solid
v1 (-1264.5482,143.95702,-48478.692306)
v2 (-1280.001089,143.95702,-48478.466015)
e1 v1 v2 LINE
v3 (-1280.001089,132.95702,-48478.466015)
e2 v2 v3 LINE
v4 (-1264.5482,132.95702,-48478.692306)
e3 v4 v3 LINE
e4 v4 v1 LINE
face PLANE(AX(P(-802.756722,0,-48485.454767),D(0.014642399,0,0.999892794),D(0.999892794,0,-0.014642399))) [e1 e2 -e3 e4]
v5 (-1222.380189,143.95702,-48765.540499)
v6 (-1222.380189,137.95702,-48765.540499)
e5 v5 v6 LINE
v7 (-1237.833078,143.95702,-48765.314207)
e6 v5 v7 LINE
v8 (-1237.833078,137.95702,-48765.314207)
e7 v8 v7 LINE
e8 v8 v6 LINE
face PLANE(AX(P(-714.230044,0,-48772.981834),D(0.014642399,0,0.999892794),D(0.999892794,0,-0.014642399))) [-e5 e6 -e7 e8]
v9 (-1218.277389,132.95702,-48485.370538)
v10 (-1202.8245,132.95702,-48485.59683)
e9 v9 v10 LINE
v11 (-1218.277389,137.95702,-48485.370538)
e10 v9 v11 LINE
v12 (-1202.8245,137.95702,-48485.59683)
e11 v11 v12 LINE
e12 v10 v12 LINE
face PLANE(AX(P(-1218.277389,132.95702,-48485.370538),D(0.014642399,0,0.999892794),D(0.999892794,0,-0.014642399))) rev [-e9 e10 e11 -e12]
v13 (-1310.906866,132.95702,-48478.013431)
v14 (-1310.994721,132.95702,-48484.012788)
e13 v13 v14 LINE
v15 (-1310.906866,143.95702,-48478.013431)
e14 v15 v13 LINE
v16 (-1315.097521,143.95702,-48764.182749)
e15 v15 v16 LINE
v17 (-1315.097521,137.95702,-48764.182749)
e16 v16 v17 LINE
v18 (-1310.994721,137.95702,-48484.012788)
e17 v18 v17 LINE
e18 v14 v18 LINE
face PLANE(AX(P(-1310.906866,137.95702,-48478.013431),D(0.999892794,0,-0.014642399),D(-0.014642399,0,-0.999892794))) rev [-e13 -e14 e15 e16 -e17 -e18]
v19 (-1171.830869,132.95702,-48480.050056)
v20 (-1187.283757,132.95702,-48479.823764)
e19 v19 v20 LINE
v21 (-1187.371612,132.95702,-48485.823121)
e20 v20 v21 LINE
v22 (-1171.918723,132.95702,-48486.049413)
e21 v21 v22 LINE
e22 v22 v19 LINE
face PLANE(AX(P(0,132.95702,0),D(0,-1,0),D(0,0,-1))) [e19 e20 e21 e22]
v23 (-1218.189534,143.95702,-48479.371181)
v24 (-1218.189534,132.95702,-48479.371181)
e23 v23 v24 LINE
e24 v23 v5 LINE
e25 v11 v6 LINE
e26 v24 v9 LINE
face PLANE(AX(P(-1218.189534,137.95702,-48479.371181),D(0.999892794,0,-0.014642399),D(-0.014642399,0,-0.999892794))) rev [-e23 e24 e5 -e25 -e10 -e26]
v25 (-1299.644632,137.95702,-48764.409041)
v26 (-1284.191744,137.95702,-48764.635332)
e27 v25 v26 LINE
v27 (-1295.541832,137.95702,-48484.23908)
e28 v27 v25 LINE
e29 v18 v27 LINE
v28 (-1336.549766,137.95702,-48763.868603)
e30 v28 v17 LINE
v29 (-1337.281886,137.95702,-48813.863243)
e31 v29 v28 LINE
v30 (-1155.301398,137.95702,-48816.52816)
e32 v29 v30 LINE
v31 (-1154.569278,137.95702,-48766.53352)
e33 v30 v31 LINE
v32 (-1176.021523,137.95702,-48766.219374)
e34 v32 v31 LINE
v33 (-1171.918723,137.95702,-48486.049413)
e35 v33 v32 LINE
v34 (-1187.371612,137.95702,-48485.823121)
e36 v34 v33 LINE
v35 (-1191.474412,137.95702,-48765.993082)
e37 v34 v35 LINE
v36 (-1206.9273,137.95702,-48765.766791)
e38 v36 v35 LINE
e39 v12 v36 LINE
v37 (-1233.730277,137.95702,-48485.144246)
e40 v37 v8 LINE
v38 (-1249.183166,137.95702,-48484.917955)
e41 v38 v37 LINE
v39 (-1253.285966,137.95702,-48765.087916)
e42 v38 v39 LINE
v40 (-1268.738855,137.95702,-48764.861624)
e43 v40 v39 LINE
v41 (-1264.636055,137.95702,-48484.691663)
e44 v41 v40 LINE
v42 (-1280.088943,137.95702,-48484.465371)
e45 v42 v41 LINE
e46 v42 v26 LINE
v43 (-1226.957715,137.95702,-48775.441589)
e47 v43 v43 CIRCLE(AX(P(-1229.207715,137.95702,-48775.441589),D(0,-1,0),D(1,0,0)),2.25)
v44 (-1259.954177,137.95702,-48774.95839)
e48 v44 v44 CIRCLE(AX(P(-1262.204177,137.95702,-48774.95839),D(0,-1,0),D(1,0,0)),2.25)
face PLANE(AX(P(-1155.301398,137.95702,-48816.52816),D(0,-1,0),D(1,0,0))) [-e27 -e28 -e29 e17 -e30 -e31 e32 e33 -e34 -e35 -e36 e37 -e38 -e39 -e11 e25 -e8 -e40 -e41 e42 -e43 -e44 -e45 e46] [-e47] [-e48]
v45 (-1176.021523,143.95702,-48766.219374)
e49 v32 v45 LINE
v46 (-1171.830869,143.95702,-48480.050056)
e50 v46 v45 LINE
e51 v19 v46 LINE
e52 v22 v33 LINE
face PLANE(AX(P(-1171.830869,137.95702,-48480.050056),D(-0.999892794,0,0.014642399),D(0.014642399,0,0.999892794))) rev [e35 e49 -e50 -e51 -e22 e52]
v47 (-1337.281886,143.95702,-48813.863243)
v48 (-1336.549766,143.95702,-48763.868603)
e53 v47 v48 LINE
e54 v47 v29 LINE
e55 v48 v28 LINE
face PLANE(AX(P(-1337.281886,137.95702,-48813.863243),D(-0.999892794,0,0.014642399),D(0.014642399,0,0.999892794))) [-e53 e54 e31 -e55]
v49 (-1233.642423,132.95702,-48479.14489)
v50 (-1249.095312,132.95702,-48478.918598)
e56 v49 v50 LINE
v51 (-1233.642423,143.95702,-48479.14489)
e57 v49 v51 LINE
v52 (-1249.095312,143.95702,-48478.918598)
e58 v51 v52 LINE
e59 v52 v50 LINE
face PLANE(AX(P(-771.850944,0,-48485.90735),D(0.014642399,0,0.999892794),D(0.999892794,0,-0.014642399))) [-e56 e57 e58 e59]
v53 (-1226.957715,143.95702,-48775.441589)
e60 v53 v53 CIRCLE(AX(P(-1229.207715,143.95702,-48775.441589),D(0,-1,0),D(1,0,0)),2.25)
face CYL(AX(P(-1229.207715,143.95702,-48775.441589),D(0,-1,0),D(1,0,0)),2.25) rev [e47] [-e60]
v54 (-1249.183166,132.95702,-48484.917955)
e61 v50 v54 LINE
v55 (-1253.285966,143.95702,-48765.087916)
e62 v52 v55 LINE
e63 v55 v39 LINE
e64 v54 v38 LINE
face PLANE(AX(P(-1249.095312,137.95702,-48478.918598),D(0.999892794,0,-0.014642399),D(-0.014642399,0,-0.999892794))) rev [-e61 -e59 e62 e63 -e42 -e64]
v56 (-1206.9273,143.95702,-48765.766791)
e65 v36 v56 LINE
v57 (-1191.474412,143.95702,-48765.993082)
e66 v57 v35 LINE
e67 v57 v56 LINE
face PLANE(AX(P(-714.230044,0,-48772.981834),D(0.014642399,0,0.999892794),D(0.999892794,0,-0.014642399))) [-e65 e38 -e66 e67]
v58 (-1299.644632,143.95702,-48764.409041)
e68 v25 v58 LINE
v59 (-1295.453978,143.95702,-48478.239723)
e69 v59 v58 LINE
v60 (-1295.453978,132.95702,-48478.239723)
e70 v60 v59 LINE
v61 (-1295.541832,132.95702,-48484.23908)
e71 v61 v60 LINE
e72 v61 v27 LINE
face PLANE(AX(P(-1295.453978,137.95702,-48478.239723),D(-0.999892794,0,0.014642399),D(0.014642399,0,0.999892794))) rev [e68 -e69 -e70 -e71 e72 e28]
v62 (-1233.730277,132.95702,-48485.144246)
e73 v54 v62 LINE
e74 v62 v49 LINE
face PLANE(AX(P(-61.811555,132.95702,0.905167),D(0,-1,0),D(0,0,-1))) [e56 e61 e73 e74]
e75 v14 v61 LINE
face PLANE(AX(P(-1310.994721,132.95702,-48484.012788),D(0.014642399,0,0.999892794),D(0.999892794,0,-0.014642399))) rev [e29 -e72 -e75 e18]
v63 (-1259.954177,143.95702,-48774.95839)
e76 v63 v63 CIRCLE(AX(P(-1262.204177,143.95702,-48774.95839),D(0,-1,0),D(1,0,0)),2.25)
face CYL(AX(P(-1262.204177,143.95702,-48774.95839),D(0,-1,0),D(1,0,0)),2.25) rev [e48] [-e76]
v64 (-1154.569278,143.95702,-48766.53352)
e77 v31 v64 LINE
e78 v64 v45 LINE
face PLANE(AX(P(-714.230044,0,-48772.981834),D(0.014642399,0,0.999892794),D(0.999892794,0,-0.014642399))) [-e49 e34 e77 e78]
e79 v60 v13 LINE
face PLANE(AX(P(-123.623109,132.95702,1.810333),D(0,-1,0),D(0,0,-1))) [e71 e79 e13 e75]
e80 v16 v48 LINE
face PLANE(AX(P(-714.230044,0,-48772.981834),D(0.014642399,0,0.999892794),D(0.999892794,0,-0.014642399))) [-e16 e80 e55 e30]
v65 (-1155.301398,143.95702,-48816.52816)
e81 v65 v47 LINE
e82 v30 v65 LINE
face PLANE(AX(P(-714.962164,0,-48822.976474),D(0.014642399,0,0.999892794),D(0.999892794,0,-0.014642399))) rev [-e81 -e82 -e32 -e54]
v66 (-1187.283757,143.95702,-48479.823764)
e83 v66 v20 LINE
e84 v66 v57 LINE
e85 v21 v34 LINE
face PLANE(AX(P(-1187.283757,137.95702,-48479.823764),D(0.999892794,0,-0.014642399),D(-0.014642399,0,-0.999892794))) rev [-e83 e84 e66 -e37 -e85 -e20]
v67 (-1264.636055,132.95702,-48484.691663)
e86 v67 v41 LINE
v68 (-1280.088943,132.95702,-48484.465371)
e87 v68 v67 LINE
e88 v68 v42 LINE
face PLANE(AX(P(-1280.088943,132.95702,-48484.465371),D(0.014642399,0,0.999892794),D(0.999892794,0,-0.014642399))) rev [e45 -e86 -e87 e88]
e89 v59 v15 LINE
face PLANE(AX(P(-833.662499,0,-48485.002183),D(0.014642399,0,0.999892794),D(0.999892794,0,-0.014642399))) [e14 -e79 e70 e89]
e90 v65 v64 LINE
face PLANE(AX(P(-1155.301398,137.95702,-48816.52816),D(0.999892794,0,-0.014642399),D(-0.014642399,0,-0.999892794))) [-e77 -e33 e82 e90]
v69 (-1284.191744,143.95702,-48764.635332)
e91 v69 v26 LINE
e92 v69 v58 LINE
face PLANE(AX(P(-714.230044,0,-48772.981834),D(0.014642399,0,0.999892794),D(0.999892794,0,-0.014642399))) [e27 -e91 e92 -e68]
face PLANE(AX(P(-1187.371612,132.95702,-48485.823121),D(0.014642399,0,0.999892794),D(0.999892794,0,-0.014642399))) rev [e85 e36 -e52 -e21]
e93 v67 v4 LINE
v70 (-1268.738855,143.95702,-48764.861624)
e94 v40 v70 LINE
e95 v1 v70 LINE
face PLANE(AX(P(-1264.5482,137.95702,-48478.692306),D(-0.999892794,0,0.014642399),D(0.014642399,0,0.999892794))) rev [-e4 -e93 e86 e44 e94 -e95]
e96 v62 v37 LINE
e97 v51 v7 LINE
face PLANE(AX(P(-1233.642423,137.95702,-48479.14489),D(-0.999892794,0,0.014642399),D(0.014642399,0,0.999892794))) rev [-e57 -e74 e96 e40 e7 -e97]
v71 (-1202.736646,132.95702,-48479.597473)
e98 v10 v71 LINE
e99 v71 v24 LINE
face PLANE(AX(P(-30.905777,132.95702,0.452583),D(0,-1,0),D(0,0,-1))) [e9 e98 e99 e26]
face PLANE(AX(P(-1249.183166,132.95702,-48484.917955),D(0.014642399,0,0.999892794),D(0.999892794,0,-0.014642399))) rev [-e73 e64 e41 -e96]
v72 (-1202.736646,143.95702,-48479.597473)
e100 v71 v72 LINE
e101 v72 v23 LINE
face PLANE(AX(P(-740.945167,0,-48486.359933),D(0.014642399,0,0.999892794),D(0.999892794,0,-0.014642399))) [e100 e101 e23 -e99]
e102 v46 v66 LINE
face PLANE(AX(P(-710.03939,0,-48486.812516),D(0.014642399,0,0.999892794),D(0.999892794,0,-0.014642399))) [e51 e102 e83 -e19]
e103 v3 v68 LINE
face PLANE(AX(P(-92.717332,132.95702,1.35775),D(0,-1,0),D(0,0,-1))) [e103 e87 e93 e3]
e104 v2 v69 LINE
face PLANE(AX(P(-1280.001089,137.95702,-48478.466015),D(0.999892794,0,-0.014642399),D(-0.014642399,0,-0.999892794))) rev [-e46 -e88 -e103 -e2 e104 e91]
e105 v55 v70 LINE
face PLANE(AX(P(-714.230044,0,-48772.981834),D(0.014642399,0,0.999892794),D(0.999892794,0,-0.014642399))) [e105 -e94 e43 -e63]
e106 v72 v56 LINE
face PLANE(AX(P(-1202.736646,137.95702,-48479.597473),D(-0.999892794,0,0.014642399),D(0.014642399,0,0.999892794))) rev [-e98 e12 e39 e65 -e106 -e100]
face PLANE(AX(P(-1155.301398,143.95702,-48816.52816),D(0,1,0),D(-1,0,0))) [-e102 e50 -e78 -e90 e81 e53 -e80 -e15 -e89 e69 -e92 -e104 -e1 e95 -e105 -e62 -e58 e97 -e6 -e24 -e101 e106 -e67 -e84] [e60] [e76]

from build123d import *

# Parameters (mm, degrees)
EXTRUDE_1_DEPTH          = 30
EXTRUDE_1_DEPTH_BACK     = 20
SKETCH_1_W               = 182
SKETCH_1_H               = 6
SKETCH_2_W               = 15.454545454
SKETCH_2_H               = 6
EXTRUDE_2_DEPTH          = 286.2
EXTRUDE_3_DEPTH          = 5
PATTERN_START            = 137.957019682
PATTERN_LINEAR_1_DEPTH   = 6
PATTERN_START_2          = 132.957019682
PATTERN_LINEAR_1_2_DEPTH = 5
SKETCH_6_R               = 2.25
CUT_EXTRUDE_1_DEPTH      = 48835.841869249


# Read off the part's stored shape, not the designer's step: Линейный массив1
with BuildPart() as part:
    # Эскиз1 → Бобышка-Вытянуть1 (new, two sides: drawn at the far end of the back side and taken through both)
    with BuildSketch(Plane(origin=(-714.669316418, 0, -48802.97861783), x_dir=(0.9998927943248835, 0, -0.01464239929711995), z_dir=(0.01464239929711995, 0, 0.9998927943248835)).offset(-EXTRUDE_1_DEPTH_BACK)):
        with Locations((-531.386445276, 140.957019682)):
            Rectangle(SKETCH_1_W, SKETCH_1_H)
    extrude(amount=EXTRUDE_1_DEPTH + EXTRUDE_1_DEPTH_BACK)

    # Эскиз2 → Бобышка-Вытянуть2 (add)
    with BuildSketch(Plane(origin=(-714.23004444, 0, -48772.981834), x_dir=(0.9998927943248835, 0, -0.01464239929711995), z_dir=(0.01464239929711995, 0, 0.9998927943248835))):
        with Locations((-469.568263457, 140.957019682)):
            Rectangle(SKETCH_2_W, SKETCH_2_H)
    extrude(amount=EXTRUDE_2_DEPTH)

    # Эскиз5 → Бобышка-Вытянуть3 (add)
    with BuildSketch(Plane.XZ.offset(-137.957019682)):
        Polygon((-1187.283757155, -48479.82376444), (-1187.371611551, -48485.823121206), (-1171.918722912, -48486.049412832), (-1171.830868516, -48480.050056066), align=None)
    extrude(amount=EXTRUDE_3_DEPTH)

    # Линейный массив1 outline → Линейный массив1 (add)
    with BuildSketch(Plane(origin=(0, 0, 0), x_dir=(1, 0, 0), z_dir=(0, 1, 0)).offset(PATTERN_START)):
        Polygon((-1310.906866272, 48478.013431436), (-1295.453977632, 48478.239723062), (-1299.644632311, 48764.409040798), (-1315.097520951, 48764.182749172), align=None)
        Polygon((-1206.927300474, 48765.766790551), (-1222.380189113, 48765.540498925), (-1218.189534435, 48479.371181189), (-1202.736645795, 48479.597472815), align=None)
        Polygon((-1237.833077753, 48765.3142073), (-1253.285966393, 48765.087915674), (-1249.095311714, 48478.918597939), (-1233.642423074, 48479.144889564), align=None)
        Polygon((-1268.738855032, 48764.861624049), (-1284.191743672, 48764.635332423), (-1280.001088993, 48478.466014687), (-1264.548200353, 48478.692306313), align=None)
    extrude(amount=PATTERN_LINEAR_1_DEPTH)

    # Pattern Linear 1 2 outline → Pattern Linear 1 2 (add)
    with BuildSketch(Plane(origin=(0, 0, 0), x_dir=(1, 0, 0), z_dir=(0, 1, 0)).offset(PATTERN_START_2)):
        Polygon((-1310.994720668, 48484.012788202), (-1310.906866272, 48478.013431436), (-1295.453977632, 48478.239723062), (-1295.541832028, 48484.239079828), align=None)
        Polygon((-1264.636054749, 48484.691663079), (-1280.088943389, 48484.465371453), (-1280.001088993, 48478.466014688), (-1264.548200353, 48478.692306313), align=None)
        Polygon((-1233.73027747, 48485.14424633), (-1249.18316611, 48484.917954704), (-1249.095311714, 48478.918597939), (-1233.642423074, 48479.144889564), align=None)
        Polygon((-1202.824500191, 48485.596829581), (-1218.27738883, 48485.370537955), (-1218.189534435, 48479.371181189), (-1202.736645795, 48479.597472815), align=None)
    extrude(amount=PATTERN_LINEAR_1_2_DEPTH)

    # Эскиз6 → Вырез-Вытянуть1 (cut, through all)
    with BuildSketch(Plane.XZ.offset(-137.957019682)):
        with Locations((-1262.204177172, -48774.958389842)):
            Circle(SKETCH_6_R)
        with Locations((-1229.207714959, -48775.441589019)):
            Circle(SKETCH_6_R)
    extrude(amount=-CUT_EXTRUDE_1_DEPTH, mode=Mode.SUBTRACT)


solid = part.part
